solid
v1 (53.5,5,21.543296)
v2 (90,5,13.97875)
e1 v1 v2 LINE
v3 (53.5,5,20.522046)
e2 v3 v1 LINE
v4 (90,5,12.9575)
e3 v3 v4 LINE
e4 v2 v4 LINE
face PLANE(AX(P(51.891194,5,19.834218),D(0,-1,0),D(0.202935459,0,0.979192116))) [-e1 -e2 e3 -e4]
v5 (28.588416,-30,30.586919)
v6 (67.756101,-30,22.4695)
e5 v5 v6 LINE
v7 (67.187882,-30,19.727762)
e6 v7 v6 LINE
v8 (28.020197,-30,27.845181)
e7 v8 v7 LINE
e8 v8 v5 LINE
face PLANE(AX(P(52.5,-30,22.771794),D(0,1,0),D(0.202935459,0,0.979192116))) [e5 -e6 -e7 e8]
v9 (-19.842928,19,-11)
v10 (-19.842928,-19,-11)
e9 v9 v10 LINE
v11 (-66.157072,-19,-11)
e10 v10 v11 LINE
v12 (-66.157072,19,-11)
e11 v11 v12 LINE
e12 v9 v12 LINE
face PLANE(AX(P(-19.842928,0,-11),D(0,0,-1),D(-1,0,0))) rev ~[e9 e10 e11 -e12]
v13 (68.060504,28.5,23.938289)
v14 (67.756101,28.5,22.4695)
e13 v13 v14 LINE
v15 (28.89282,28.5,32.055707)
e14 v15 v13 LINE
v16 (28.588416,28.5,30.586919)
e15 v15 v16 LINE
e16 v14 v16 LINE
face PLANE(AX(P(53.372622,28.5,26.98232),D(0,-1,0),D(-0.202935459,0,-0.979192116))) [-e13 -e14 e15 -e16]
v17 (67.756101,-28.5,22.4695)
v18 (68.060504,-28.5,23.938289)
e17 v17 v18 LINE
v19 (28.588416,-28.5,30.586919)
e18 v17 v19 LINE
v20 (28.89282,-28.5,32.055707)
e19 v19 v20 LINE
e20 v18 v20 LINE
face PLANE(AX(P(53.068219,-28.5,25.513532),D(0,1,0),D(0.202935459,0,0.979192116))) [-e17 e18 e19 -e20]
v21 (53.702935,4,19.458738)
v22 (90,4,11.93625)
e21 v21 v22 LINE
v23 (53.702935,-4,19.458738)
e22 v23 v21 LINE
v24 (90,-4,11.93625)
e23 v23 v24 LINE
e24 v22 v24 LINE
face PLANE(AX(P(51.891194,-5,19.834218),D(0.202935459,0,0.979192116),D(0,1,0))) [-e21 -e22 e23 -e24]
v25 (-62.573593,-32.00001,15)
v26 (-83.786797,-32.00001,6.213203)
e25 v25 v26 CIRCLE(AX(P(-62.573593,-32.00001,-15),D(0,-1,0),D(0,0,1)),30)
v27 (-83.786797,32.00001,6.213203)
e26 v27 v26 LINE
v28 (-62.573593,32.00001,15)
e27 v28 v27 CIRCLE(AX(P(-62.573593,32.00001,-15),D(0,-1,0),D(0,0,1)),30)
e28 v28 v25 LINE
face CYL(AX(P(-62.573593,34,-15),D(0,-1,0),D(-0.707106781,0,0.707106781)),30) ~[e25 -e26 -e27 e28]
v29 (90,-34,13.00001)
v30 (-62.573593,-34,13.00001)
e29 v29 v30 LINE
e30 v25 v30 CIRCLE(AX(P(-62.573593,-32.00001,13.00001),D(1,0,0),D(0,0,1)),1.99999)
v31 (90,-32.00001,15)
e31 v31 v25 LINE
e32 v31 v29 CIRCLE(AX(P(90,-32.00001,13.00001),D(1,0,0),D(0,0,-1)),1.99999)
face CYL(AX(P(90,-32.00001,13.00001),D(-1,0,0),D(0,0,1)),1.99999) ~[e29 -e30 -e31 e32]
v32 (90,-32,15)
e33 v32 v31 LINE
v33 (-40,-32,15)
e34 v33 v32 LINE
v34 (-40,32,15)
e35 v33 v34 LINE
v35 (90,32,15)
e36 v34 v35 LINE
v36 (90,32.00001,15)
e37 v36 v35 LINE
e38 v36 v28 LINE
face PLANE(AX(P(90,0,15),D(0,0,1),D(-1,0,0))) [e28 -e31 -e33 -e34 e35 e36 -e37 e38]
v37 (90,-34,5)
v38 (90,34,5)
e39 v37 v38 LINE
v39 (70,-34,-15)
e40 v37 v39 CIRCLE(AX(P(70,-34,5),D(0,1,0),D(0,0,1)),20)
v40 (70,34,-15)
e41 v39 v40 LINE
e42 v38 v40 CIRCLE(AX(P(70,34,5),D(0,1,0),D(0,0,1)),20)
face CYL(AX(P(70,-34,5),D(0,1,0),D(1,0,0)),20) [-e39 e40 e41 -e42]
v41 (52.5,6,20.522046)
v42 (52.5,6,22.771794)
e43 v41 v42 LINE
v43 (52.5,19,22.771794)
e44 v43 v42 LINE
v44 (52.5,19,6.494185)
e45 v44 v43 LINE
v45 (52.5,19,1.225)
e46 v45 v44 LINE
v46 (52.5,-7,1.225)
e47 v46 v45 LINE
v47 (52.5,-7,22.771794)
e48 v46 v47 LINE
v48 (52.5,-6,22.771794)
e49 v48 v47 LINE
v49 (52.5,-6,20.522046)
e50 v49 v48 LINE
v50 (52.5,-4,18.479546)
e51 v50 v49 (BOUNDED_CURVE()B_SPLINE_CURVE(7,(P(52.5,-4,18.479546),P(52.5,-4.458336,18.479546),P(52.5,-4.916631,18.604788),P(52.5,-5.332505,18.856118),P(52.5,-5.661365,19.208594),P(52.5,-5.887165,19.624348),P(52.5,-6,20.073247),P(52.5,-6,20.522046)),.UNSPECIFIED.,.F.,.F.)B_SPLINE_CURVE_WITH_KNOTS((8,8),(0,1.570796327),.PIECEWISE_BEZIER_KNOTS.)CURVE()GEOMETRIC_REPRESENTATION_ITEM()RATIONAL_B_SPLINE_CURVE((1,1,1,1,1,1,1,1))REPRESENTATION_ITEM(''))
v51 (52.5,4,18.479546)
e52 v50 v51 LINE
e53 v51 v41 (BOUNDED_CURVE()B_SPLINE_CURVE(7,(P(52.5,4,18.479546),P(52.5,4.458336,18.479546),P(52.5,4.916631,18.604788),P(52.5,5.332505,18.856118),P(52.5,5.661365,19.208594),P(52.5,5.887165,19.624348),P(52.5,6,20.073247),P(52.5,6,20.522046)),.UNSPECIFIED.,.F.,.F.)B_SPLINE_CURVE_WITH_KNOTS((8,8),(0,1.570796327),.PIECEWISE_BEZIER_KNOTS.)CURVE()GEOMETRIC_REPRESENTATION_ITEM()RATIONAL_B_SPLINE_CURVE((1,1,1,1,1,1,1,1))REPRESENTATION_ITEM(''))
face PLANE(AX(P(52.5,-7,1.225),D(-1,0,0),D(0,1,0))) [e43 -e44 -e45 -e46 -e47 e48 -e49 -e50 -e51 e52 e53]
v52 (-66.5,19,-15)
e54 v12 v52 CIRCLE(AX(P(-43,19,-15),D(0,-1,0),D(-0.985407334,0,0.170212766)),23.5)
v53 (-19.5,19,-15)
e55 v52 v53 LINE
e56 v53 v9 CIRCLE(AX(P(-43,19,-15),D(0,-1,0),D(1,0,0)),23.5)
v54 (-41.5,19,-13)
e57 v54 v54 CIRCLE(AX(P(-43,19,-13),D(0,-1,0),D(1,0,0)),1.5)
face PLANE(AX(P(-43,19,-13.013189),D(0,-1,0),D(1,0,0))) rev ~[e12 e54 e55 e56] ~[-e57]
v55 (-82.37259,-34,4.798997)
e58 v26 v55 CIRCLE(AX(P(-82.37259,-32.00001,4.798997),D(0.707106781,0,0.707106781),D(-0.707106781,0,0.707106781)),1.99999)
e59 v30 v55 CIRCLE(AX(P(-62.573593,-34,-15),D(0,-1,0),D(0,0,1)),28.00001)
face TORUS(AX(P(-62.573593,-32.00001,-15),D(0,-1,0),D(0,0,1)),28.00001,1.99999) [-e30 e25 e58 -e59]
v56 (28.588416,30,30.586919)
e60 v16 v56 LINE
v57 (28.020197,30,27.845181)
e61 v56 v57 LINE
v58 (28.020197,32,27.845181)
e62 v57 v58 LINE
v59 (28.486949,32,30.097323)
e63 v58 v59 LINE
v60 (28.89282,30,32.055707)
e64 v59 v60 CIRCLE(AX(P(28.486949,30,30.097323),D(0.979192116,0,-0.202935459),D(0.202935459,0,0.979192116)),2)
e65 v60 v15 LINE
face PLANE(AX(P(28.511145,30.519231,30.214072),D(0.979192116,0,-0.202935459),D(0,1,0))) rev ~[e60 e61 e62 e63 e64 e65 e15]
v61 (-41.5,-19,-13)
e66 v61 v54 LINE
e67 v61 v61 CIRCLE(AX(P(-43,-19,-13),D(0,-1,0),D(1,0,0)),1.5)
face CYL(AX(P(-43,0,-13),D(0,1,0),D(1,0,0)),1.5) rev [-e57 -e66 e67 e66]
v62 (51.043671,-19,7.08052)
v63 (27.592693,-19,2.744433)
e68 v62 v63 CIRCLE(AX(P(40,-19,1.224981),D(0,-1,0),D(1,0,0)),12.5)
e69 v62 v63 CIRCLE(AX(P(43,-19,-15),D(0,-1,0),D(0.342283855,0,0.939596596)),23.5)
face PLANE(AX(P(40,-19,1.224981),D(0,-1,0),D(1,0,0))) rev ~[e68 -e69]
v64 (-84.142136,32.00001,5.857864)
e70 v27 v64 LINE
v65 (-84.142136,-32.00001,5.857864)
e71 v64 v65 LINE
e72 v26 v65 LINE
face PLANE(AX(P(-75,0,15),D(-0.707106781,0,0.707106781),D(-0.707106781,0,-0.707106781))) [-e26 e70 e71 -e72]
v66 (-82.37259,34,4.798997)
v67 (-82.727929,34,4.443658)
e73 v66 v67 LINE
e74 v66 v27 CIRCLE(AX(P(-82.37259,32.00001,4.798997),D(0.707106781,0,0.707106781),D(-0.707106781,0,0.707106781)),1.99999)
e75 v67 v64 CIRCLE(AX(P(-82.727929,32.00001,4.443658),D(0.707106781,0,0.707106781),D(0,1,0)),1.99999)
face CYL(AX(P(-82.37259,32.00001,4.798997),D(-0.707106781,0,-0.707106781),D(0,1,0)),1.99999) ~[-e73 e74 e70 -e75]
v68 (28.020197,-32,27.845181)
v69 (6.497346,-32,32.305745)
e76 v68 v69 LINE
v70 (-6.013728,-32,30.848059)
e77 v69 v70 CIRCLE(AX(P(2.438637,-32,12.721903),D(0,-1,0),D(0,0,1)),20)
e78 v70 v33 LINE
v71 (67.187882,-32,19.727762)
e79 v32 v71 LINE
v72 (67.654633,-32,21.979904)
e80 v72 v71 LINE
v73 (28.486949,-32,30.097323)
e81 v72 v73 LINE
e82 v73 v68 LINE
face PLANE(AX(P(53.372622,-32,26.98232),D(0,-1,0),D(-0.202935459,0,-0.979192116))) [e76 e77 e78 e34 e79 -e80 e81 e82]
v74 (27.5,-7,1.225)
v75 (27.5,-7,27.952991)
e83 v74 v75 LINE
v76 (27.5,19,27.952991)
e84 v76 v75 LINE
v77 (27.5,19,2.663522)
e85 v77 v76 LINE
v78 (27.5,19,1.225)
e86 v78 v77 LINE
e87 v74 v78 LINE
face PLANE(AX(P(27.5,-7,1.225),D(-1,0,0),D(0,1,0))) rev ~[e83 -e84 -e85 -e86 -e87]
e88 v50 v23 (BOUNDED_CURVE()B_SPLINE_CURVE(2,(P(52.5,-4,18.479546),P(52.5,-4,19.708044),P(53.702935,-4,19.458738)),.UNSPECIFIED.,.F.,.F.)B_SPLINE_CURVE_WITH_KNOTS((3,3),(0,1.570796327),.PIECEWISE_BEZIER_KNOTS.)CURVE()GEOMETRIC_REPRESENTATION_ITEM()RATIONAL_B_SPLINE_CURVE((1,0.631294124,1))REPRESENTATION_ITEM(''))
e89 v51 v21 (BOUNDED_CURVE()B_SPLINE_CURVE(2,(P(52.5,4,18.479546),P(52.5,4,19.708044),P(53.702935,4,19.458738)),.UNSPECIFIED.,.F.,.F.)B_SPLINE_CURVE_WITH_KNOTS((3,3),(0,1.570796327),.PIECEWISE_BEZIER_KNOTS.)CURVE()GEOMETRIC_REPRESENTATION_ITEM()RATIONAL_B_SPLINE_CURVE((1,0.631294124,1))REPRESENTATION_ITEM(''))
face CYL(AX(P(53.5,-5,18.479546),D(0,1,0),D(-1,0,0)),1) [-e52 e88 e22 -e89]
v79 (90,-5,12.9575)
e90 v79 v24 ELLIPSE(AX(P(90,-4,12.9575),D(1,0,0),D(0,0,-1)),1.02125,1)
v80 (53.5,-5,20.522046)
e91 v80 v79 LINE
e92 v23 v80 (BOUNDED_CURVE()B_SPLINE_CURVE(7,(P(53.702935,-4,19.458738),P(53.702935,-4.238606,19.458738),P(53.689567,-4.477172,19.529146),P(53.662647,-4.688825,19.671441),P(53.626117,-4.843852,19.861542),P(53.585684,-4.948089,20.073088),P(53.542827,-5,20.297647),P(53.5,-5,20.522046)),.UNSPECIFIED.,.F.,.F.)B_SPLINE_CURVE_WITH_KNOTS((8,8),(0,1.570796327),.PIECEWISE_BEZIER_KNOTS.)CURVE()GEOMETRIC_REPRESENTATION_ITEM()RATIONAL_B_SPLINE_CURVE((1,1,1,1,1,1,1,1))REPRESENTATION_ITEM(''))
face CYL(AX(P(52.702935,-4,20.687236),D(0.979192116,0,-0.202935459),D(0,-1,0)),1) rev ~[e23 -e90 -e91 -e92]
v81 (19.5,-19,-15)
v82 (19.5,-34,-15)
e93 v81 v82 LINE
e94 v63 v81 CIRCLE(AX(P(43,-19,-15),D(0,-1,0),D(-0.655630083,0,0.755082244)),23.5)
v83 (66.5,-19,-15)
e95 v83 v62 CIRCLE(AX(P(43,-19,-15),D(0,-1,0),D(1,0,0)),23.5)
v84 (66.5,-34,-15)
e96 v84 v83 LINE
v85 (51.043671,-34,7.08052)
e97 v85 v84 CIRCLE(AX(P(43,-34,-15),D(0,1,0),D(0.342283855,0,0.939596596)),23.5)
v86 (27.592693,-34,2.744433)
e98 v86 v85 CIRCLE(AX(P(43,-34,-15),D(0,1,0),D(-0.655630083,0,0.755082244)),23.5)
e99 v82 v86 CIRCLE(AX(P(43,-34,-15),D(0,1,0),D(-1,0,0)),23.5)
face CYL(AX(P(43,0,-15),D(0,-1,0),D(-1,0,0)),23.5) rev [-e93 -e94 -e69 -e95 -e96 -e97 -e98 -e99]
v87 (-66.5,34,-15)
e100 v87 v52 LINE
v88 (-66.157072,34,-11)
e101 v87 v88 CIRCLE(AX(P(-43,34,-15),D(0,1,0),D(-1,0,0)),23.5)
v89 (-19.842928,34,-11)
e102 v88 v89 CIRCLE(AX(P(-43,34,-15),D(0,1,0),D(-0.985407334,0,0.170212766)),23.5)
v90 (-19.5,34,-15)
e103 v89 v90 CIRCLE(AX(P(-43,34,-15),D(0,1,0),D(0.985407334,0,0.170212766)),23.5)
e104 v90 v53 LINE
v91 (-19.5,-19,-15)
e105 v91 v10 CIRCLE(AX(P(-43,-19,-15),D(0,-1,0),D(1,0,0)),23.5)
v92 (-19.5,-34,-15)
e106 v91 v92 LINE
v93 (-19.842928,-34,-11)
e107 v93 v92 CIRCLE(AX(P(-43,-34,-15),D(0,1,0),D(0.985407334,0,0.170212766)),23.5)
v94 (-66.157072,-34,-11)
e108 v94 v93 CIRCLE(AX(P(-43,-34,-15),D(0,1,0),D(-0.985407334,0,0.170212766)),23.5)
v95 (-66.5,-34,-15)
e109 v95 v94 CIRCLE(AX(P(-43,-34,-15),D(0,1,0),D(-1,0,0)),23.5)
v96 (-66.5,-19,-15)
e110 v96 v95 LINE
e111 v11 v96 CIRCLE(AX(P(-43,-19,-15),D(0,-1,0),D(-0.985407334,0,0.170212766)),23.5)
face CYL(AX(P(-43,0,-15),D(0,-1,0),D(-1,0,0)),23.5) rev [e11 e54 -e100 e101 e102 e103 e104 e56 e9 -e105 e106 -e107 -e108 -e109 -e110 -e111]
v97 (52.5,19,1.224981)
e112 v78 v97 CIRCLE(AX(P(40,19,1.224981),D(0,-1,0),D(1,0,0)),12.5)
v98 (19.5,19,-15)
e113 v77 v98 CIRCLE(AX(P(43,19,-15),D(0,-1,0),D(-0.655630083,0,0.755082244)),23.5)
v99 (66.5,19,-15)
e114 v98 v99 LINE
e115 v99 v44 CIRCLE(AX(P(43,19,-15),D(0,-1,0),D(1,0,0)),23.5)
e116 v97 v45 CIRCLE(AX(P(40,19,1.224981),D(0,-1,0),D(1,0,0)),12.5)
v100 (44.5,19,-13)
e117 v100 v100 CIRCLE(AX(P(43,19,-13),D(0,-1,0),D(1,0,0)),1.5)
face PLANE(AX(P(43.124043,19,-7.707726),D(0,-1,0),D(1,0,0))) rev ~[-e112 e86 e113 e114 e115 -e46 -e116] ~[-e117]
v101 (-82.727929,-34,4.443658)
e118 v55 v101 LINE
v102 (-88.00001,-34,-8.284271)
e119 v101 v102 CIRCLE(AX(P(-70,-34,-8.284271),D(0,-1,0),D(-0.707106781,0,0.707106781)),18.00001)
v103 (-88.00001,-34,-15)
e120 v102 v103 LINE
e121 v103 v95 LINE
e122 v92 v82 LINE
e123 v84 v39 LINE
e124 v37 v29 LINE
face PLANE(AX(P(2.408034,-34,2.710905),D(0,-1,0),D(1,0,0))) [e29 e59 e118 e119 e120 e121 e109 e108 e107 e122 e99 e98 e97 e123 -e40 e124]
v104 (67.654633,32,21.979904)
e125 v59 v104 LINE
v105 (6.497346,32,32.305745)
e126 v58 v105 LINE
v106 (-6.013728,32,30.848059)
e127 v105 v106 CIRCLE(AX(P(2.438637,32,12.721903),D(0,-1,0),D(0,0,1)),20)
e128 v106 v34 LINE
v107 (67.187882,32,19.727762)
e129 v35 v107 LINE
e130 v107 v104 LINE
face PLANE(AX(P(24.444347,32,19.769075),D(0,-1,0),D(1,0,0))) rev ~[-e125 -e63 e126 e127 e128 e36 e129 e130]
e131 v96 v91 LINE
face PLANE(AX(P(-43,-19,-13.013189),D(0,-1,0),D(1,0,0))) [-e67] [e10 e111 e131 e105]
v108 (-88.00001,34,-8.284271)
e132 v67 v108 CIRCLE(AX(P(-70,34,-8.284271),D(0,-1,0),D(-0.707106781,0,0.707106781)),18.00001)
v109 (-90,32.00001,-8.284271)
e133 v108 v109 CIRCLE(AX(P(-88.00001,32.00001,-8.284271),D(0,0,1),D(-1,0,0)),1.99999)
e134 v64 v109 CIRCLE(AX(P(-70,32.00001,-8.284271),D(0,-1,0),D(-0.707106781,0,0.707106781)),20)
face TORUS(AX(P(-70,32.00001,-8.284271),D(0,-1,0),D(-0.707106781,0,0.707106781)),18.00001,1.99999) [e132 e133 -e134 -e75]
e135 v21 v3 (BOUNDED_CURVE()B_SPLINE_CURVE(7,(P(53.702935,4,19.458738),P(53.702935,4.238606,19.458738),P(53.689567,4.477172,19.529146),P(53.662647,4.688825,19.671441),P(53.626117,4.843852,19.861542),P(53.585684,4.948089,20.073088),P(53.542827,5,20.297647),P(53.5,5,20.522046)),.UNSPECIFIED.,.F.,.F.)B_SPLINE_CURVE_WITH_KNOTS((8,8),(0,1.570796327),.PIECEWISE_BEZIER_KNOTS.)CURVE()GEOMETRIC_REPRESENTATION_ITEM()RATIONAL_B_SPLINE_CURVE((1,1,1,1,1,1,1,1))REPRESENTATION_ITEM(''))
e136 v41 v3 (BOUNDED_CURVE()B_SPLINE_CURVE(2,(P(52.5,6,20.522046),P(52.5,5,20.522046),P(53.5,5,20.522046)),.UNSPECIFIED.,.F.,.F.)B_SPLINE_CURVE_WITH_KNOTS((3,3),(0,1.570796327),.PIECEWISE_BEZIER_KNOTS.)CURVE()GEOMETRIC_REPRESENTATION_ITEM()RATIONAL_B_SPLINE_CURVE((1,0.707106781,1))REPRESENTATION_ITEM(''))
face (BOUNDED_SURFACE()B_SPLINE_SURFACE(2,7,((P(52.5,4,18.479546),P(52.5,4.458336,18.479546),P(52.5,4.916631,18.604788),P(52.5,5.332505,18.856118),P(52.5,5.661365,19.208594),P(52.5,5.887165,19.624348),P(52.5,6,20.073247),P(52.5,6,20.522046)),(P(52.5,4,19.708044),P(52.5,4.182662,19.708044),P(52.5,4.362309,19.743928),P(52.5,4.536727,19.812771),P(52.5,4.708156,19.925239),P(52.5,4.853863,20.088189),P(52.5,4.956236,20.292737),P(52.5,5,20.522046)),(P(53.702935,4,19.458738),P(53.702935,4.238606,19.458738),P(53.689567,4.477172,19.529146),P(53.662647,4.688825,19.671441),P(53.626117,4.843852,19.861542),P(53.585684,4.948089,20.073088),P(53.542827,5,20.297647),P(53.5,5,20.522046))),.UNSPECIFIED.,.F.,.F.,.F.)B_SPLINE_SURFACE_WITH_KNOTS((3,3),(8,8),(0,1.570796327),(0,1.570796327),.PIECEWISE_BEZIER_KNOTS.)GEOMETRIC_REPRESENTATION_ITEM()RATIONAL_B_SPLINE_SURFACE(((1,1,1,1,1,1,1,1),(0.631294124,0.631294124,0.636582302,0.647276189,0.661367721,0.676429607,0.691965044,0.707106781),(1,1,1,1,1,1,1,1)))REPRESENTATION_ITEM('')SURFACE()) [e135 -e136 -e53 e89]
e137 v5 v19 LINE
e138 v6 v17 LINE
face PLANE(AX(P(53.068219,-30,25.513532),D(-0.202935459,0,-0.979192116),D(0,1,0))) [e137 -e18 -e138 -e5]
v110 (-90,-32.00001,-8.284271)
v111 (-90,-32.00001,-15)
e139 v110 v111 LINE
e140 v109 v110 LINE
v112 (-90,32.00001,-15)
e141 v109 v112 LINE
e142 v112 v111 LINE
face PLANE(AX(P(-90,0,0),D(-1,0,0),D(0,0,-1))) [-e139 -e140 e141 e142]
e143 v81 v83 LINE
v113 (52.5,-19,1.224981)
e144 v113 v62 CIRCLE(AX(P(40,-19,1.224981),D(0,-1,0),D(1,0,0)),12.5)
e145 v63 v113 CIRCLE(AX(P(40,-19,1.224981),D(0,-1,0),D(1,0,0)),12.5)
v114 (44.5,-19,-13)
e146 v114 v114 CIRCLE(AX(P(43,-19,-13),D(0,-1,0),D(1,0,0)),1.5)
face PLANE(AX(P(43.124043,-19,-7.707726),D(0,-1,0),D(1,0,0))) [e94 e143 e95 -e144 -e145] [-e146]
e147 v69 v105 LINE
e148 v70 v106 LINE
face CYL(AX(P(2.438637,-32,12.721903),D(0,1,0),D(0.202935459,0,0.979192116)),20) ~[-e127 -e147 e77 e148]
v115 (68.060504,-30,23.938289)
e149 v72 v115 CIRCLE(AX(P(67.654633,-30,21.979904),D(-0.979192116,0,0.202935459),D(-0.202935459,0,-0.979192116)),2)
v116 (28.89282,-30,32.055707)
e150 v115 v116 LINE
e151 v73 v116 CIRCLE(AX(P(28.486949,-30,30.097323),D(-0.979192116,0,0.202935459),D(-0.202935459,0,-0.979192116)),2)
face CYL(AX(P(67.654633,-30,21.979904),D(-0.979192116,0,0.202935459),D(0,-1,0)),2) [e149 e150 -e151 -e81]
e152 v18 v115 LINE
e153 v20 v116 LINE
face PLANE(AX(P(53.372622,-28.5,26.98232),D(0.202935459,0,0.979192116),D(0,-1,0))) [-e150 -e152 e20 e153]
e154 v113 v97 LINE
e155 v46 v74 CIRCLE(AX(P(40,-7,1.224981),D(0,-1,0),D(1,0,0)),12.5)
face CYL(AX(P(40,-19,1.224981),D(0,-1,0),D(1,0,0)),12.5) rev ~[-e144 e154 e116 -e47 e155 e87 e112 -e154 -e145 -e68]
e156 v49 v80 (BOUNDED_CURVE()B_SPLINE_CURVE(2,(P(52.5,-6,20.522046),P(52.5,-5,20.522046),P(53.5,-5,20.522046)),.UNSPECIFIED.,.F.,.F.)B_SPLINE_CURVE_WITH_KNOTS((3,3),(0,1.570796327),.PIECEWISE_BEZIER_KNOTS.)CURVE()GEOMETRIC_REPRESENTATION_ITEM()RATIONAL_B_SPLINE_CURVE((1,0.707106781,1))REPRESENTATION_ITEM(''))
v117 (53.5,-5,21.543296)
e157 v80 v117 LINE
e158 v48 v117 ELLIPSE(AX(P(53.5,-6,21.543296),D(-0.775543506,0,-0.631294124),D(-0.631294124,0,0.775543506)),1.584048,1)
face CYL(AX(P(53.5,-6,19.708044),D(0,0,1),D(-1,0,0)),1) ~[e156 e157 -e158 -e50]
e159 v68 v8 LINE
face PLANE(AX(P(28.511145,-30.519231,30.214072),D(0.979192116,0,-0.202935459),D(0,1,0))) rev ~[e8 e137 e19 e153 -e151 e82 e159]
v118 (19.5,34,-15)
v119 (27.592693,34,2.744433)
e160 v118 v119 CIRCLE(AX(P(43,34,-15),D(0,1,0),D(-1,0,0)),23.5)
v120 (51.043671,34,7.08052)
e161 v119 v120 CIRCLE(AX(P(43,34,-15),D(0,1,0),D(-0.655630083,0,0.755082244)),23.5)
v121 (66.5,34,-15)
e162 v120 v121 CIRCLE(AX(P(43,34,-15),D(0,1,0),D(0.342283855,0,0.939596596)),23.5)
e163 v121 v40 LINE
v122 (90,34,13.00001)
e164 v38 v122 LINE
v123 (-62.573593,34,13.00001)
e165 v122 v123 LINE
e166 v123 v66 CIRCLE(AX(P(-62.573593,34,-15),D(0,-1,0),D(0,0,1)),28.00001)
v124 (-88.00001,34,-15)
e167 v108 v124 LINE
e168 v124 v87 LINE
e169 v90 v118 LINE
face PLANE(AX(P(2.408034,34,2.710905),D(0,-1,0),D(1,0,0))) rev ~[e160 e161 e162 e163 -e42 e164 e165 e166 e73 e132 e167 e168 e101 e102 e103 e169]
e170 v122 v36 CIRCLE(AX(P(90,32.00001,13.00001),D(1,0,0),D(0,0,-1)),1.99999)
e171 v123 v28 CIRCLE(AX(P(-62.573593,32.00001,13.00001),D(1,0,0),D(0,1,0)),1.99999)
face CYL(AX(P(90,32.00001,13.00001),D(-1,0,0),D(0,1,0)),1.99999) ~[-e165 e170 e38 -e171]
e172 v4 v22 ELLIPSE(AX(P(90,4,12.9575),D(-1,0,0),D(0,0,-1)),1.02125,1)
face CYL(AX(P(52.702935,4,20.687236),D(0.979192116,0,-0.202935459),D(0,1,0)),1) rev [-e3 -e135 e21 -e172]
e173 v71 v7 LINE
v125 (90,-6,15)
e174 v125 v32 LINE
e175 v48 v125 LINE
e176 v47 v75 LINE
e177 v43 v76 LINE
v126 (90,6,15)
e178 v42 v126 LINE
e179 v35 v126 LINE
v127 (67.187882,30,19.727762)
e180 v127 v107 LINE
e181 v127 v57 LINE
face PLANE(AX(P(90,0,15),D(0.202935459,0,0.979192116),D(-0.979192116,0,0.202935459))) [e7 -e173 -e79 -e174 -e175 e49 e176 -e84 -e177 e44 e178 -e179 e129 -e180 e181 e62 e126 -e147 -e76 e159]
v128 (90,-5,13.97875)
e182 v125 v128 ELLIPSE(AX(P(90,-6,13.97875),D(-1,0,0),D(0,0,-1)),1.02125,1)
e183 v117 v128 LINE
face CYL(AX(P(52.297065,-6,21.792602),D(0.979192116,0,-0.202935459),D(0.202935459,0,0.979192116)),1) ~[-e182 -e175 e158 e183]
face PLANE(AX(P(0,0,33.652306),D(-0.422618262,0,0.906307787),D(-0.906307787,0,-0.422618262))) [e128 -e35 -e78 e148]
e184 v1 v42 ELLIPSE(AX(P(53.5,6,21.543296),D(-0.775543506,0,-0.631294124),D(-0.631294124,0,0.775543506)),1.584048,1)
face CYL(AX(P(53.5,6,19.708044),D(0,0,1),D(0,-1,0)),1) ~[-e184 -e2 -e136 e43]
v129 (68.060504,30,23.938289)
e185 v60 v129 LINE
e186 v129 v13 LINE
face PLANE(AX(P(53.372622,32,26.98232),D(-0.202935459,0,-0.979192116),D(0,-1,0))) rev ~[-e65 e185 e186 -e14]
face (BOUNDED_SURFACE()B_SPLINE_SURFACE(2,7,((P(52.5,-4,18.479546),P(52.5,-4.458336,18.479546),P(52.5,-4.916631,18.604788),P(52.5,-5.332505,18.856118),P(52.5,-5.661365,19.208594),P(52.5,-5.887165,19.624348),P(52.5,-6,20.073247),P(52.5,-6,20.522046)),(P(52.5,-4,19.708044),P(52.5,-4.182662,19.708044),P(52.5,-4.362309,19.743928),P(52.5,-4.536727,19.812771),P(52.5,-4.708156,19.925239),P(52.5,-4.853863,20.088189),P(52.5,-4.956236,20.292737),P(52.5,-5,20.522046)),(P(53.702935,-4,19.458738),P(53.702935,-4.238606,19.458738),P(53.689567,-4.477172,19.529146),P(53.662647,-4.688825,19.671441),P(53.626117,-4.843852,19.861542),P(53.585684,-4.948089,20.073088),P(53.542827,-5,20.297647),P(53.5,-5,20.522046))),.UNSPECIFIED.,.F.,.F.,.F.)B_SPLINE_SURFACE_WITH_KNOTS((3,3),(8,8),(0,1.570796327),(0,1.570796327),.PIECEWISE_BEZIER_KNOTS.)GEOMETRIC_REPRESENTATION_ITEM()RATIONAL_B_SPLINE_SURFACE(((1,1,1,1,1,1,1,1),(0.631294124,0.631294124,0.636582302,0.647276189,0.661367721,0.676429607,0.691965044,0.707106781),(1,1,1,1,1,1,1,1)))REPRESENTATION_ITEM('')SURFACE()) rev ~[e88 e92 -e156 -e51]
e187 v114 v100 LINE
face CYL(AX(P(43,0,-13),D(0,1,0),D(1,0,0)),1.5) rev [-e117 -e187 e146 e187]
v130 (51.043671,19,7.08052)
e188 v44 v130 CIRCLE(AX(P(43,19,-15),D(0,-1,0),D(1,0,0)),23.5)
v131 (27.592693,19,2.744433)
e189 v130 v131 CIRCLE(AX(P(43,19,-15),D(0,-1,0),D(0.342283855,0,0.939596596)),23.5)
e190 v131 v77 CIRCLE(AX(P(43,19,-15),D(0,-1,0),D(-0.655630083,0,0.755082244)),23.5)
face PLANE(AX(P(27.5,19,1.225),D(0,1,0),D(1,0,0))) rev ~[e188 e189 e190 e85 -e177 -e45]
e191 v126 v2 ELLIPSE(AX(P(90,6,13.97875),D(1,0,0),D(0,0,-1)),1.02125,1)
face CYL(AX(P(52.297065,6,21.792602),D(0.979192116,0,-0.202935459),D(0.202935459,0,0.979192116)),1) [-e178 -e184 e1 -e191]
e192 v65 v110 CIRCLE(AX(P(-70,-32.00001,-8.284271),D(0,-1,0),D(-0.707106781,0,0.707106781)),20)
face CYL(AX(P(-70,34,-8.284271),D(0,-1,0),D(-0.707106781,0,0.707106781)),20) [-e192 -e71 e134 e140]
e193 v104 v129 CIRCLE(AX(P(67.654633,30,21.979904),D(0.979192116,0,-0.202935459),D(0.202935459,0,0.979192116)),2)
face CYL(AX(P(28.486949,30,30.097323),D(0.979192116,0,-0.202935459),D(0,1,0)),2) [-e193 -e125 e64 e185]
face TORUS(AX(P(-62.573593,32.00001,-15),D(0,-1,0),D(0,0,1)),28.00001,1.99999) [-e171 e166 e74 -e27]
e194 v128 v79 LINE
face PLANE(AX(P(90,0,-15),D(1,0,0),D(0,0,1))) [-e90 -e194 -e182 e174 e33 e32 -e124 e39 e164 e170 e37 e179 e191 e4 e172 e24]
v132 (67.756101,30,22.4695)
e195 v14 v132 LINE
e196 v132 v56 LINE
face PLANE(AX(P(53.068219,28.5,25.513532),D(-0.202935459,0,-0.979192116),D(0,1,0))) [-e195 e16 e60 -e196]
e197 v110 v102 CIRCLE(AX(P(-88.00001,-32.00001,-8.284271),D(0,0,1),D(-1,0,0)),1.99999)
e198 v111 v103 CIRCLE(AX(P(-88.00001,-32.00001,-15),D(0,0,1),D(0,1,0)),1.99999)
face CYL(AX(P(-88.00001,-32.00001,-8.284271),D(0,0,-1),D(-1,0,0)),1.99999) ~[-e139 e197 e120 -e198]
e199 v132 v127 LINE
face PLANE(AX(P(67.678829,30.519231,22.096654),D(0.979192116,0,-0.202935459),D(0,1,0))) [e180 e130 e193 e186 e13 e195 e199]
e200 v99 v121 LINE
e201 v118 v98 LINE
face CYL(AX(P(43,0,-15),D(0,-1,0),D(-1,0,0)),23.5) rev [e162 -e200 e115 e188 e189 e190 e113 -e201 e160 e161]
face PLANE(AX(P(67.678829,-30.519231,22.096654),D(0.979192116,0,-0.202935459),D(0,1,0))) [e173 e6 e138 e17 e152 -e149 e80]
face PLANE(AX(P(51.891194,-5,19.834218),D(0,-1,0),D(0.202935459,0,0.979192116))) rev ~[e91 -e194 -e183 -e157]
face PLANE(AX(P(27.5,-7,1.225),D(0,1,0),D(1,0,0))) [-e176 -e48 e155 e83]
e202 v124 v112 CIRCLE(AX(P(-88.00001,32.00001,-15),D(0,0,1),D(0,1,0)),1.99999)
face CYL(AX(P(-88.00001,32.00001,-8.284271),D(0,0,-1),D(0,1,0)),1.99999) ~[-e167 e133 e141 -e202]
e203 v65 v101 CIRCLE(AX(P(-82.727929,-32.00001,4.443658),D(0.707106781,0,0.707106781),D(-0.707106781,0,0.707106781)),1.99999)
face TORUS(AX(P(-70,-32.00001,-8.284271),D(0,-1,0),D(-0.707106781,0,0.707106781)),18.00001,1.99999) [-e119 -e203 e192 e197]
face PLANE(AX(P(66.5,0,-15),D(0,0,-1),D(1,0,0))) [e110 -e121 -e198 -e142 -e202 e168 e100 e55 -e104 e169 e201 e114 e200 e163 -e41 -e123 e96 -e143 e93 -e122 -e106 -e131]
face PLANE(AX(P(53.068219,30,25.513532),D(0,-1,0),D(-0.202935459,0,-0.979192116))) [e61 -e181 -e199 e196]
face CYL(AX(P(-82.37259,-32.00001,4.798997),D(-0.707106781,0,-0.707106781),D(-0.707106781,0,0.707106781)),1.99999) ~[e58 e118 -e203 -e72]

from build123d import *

# Parameters (mm, degrees)
F1_DEPTH       = 34
F2_DEPTH       = 32
F0_R           = 1.5
F3_DEPTH       = 19
F4_R           = 12.5
F5_DEPTH       = 38
F7_W           = 25
F7_H           = 26
F8_DEPTH       = 32.4283063262
F9_R           = 20
F10_R          = 30
F11_R          = 1.99999
F12_R          = 20
F15_DEPTH      = 15
F15_DEPTH_BACK = 25
F16_R          = 2
F17_W          = 10
F17_H          = 6
F18_DEPTH      = 40
F19_R          = 1


# Not quite as in the source:
# - a fillet or chamfer is up to 0.001 mm smaller than in the source, because OpenCascade refuses the exact size


with BuildPart() as f1:
    # F0 (on Front) → F1 (new body, symmetric)
    with BuildSketch(Plane.XZ):
        with BuildLine():
            Line((90, -15), (90, 15))
            Line((90, 15), (-40, 15))
            Line((-40, 15), (-75, 15))
            Line((-75, 15), (-90, 0))
            Line((-90, 0), (-90, -15))
            Line((-90, -15), (-66.5, -15))
            ThreePointArc((-66.5, -15), (-66.4141111332, -12.9926634954), (-66.1570723538, -11))
            ThreePointArc((-66.1570723538, -11), (-43, 8.5), (-19.8429276462, -11))
            ThreePointArc((-19.8429276462, -11), (-19.5858888668, -12.9926634954), (-19.5, -15))
            Line((-19.5, -15), (19.5, -15))
            ThreePointArc((19.5, -15), (21.6186797268, -5.2486337688), (27.5926930532, 2.7444327226))
            ThreePointArc((27.5926930532, 2.7444327226), (37.7272727273, 13.516632815), (51.0436705831, 7.0805200018))
            ThreePointArc((51.0436705831, 7.0805200018), (62.2519642985, -1.5236551451), (66.5, -15))
            Line((66.5, -15), (90, -15))
        make_face()
        with BuildLine():
            ThreePointArc((27.5926930532, 2.7444327226), (38.7272727273, 8.1083059018), (51.0436705831, 7.0805200018))
            ThreePointArc((51.0436705831, 7.0805200018), (37.7272727273, 13.516632815), (27.5926930532, 2.7444327226))
        make_face()
    extrude(amount=F1_DEPTH, both=True)

    # F0 (on Front) → F2 (join, symmetric)
    with BuildSketch(Plane.XZ):
        Polygon((-40, 15), (90, 15), (0, 33.6523063262), align=None)
    extrude(amount=F2_DEPTH, both=True)

    # F0 (on Front) → F3 (join, symmetric)
    with BuildSketch(Plane.XZ):
        with BuildLine():
            Line((-66.5, -15), (-19.5, -15))
            ThreePointArc((-19.5, -15), (-19.5858888668, -12.9926634954), (-19.8429276462, -11))
            Line((-19.8429276462, -11), (-66.1570723538, -11))
            ThreePointArc((-66.1570723538, -11), (-66.4141111332, -12.9926634954), (-66.5, -15))
        make_face()
        with Locations((-43, -13)):
            Circle(F0_R, mode=Mode.SUBTRACT)
        with BuildLine():
            Line((19.5, -15), (66.5, -15))
            ThreePointArc((66.5, -15), (62.2519642985, -1.5236551451), (51.0436705831, 7.0805200018))
            ThreePointArc((51.0436705831, 7.0805200018), (52.1304551087, 4.2419425981), (52.5, 1.2249807396))
            ThreePointArc((52.5, 1.2249807396), (39.2388616534, -11.2518244772), (27.5926930532, 2.7444327226))
            ThreePointArc((27.5926930532, 2.7444327226), (21.6186797268, -5.2486337688), (19.5, -15))
        make_face()
        with Locations((43, -13)):
            Circle(F0_R, mode=Mode.SUBTRACT)
        with BuildLine():
            ThreePointArc((52.5, 1.2249807396), (52.1304551087, 4.2419425981), (51.0436705831, 7.0805200018))
            ThreePointArc((51.0436705831, 7.0805200018), (38.7272727273, 8.1083059018), (27.5926930532, 2.7444327226))
            ThreePointArc((27.5926930532, 2.7444327226), (39.2388616534, -11.2518244772), (52.5, 1.2249807396))
        make_face()
    extrude(amount=F3_DEPTH, both=True)

    # F4 (on face) → F5 (cut)
    with BuildSketch(Plane.XZ.offset(19)):
        with Locations((40, 1.2249807396)):
            Circle(F4_R)
    extrude(amount=-F5_DEPTH, mode=Mode.SUBTRACT)

    # F7 (on offset) → F8 (cut, through all)
    with BuildSketch(Plane.XY.offset(1.225)):
        with Locations((40, 6)):
            Rectangle(F7_W, F7_H)
    extrude(amount=F8_DEPTH, mode=Mode.SUBTRACT)

    # F9
    f9_edges = [f1.edges().sort_by_distance(p)[0] for p in [
        (0, 0, 33.652306),
        (-90, 0, 0),
    ]]
    fillet(f9_edges, radius=F9_R)

    # F10
    f10_edges = [f1.edges().sort_by_distance(p)[0] for p in [
        (-75, 0, 15),
    ]]
    fillet(f10_edges, radius=F10_R)

    # F11 (radius 2 in the source; OpenCascade refuses exactly that, so slightly less here)
    f11_edges = [f1.edges().sort_by_distance(p)[0] for p in [
        (13.713203, -34, 15),
        (13.713203, 34, 15),
    ]]
    fillet(f11_edges, radius=F11_R)

    # F12
    f12_edges = [f1.edges().sort_by_distance(p)[0] for p in [
        (90, 0, -15),
    ]]
    fillet(f12_edges, radius=F12_R)

    # F14 (on face) → F15 (join, two sides)
    with BuildSketch(Plane(origin=(45.8128559398, 0, -9.4946158074), x_dir=(0, 1, 0), z_dir=(0.9791921158, 0, -0.2029354588))) as f15_sk:
        Polygon((-32, 37.2520730314), (-32, 32.9520730314), (-30, 32.9520730314), (-30, 35.7520730314), (-28.5, 35.7520730314), (-28.5, 37.2520730314), align=None)
        Polygon((28.5, 35.7520730314), (30, 35.7520730314), (30, 32.9520730314), (32, 32.9520730314), (32, 37.2520730314), (28.5, 37.2520730314), align=None)
    extrude(amount=F15_DEPTH)
    extrude(f15_sk.sketch, amount=-F15_DEPTH_BACK)

    # F16
    f16_edges = [f1.edges().sort_by_distance(p)[0] for p in [
        (48.476662, -32, 27.996998),
        (48.476662, 32, 27.996998),
    ]]
    fillet(f16_edges, radius=F16_R)

    # F17 (on face) → F18 (cut)
    with BuildSketch(Plane(origin=(45.8128559398, 0, -9.4946158074), x_dir=(0, 1, 0), z_dir=(0.9791921158, 0, -0.2029354588))):
        with Locations((0, 32.9520730314)):
            Rectangle(F17_W, F17_H)
    extrude(amount=F18_DEPTH, mode=Mode.SUBTRACT)

    # F19
    f19_edges = [f1.edges().sort_by_distance(p)[0] for p in [
        (52.5, 0, 19.708044),
        (52.5, -5, 21.239919),
        (52.5, 5, 21.239919),
        (71.25, -5, 15.822147),
        (71.25, 5, 15.822147),
        (71.25, -5, 18.885897),
        (71.25, 5, 18.885897),
    ]]
    fillet(f19_edges, radius=F19_R)


solid = f1.part
